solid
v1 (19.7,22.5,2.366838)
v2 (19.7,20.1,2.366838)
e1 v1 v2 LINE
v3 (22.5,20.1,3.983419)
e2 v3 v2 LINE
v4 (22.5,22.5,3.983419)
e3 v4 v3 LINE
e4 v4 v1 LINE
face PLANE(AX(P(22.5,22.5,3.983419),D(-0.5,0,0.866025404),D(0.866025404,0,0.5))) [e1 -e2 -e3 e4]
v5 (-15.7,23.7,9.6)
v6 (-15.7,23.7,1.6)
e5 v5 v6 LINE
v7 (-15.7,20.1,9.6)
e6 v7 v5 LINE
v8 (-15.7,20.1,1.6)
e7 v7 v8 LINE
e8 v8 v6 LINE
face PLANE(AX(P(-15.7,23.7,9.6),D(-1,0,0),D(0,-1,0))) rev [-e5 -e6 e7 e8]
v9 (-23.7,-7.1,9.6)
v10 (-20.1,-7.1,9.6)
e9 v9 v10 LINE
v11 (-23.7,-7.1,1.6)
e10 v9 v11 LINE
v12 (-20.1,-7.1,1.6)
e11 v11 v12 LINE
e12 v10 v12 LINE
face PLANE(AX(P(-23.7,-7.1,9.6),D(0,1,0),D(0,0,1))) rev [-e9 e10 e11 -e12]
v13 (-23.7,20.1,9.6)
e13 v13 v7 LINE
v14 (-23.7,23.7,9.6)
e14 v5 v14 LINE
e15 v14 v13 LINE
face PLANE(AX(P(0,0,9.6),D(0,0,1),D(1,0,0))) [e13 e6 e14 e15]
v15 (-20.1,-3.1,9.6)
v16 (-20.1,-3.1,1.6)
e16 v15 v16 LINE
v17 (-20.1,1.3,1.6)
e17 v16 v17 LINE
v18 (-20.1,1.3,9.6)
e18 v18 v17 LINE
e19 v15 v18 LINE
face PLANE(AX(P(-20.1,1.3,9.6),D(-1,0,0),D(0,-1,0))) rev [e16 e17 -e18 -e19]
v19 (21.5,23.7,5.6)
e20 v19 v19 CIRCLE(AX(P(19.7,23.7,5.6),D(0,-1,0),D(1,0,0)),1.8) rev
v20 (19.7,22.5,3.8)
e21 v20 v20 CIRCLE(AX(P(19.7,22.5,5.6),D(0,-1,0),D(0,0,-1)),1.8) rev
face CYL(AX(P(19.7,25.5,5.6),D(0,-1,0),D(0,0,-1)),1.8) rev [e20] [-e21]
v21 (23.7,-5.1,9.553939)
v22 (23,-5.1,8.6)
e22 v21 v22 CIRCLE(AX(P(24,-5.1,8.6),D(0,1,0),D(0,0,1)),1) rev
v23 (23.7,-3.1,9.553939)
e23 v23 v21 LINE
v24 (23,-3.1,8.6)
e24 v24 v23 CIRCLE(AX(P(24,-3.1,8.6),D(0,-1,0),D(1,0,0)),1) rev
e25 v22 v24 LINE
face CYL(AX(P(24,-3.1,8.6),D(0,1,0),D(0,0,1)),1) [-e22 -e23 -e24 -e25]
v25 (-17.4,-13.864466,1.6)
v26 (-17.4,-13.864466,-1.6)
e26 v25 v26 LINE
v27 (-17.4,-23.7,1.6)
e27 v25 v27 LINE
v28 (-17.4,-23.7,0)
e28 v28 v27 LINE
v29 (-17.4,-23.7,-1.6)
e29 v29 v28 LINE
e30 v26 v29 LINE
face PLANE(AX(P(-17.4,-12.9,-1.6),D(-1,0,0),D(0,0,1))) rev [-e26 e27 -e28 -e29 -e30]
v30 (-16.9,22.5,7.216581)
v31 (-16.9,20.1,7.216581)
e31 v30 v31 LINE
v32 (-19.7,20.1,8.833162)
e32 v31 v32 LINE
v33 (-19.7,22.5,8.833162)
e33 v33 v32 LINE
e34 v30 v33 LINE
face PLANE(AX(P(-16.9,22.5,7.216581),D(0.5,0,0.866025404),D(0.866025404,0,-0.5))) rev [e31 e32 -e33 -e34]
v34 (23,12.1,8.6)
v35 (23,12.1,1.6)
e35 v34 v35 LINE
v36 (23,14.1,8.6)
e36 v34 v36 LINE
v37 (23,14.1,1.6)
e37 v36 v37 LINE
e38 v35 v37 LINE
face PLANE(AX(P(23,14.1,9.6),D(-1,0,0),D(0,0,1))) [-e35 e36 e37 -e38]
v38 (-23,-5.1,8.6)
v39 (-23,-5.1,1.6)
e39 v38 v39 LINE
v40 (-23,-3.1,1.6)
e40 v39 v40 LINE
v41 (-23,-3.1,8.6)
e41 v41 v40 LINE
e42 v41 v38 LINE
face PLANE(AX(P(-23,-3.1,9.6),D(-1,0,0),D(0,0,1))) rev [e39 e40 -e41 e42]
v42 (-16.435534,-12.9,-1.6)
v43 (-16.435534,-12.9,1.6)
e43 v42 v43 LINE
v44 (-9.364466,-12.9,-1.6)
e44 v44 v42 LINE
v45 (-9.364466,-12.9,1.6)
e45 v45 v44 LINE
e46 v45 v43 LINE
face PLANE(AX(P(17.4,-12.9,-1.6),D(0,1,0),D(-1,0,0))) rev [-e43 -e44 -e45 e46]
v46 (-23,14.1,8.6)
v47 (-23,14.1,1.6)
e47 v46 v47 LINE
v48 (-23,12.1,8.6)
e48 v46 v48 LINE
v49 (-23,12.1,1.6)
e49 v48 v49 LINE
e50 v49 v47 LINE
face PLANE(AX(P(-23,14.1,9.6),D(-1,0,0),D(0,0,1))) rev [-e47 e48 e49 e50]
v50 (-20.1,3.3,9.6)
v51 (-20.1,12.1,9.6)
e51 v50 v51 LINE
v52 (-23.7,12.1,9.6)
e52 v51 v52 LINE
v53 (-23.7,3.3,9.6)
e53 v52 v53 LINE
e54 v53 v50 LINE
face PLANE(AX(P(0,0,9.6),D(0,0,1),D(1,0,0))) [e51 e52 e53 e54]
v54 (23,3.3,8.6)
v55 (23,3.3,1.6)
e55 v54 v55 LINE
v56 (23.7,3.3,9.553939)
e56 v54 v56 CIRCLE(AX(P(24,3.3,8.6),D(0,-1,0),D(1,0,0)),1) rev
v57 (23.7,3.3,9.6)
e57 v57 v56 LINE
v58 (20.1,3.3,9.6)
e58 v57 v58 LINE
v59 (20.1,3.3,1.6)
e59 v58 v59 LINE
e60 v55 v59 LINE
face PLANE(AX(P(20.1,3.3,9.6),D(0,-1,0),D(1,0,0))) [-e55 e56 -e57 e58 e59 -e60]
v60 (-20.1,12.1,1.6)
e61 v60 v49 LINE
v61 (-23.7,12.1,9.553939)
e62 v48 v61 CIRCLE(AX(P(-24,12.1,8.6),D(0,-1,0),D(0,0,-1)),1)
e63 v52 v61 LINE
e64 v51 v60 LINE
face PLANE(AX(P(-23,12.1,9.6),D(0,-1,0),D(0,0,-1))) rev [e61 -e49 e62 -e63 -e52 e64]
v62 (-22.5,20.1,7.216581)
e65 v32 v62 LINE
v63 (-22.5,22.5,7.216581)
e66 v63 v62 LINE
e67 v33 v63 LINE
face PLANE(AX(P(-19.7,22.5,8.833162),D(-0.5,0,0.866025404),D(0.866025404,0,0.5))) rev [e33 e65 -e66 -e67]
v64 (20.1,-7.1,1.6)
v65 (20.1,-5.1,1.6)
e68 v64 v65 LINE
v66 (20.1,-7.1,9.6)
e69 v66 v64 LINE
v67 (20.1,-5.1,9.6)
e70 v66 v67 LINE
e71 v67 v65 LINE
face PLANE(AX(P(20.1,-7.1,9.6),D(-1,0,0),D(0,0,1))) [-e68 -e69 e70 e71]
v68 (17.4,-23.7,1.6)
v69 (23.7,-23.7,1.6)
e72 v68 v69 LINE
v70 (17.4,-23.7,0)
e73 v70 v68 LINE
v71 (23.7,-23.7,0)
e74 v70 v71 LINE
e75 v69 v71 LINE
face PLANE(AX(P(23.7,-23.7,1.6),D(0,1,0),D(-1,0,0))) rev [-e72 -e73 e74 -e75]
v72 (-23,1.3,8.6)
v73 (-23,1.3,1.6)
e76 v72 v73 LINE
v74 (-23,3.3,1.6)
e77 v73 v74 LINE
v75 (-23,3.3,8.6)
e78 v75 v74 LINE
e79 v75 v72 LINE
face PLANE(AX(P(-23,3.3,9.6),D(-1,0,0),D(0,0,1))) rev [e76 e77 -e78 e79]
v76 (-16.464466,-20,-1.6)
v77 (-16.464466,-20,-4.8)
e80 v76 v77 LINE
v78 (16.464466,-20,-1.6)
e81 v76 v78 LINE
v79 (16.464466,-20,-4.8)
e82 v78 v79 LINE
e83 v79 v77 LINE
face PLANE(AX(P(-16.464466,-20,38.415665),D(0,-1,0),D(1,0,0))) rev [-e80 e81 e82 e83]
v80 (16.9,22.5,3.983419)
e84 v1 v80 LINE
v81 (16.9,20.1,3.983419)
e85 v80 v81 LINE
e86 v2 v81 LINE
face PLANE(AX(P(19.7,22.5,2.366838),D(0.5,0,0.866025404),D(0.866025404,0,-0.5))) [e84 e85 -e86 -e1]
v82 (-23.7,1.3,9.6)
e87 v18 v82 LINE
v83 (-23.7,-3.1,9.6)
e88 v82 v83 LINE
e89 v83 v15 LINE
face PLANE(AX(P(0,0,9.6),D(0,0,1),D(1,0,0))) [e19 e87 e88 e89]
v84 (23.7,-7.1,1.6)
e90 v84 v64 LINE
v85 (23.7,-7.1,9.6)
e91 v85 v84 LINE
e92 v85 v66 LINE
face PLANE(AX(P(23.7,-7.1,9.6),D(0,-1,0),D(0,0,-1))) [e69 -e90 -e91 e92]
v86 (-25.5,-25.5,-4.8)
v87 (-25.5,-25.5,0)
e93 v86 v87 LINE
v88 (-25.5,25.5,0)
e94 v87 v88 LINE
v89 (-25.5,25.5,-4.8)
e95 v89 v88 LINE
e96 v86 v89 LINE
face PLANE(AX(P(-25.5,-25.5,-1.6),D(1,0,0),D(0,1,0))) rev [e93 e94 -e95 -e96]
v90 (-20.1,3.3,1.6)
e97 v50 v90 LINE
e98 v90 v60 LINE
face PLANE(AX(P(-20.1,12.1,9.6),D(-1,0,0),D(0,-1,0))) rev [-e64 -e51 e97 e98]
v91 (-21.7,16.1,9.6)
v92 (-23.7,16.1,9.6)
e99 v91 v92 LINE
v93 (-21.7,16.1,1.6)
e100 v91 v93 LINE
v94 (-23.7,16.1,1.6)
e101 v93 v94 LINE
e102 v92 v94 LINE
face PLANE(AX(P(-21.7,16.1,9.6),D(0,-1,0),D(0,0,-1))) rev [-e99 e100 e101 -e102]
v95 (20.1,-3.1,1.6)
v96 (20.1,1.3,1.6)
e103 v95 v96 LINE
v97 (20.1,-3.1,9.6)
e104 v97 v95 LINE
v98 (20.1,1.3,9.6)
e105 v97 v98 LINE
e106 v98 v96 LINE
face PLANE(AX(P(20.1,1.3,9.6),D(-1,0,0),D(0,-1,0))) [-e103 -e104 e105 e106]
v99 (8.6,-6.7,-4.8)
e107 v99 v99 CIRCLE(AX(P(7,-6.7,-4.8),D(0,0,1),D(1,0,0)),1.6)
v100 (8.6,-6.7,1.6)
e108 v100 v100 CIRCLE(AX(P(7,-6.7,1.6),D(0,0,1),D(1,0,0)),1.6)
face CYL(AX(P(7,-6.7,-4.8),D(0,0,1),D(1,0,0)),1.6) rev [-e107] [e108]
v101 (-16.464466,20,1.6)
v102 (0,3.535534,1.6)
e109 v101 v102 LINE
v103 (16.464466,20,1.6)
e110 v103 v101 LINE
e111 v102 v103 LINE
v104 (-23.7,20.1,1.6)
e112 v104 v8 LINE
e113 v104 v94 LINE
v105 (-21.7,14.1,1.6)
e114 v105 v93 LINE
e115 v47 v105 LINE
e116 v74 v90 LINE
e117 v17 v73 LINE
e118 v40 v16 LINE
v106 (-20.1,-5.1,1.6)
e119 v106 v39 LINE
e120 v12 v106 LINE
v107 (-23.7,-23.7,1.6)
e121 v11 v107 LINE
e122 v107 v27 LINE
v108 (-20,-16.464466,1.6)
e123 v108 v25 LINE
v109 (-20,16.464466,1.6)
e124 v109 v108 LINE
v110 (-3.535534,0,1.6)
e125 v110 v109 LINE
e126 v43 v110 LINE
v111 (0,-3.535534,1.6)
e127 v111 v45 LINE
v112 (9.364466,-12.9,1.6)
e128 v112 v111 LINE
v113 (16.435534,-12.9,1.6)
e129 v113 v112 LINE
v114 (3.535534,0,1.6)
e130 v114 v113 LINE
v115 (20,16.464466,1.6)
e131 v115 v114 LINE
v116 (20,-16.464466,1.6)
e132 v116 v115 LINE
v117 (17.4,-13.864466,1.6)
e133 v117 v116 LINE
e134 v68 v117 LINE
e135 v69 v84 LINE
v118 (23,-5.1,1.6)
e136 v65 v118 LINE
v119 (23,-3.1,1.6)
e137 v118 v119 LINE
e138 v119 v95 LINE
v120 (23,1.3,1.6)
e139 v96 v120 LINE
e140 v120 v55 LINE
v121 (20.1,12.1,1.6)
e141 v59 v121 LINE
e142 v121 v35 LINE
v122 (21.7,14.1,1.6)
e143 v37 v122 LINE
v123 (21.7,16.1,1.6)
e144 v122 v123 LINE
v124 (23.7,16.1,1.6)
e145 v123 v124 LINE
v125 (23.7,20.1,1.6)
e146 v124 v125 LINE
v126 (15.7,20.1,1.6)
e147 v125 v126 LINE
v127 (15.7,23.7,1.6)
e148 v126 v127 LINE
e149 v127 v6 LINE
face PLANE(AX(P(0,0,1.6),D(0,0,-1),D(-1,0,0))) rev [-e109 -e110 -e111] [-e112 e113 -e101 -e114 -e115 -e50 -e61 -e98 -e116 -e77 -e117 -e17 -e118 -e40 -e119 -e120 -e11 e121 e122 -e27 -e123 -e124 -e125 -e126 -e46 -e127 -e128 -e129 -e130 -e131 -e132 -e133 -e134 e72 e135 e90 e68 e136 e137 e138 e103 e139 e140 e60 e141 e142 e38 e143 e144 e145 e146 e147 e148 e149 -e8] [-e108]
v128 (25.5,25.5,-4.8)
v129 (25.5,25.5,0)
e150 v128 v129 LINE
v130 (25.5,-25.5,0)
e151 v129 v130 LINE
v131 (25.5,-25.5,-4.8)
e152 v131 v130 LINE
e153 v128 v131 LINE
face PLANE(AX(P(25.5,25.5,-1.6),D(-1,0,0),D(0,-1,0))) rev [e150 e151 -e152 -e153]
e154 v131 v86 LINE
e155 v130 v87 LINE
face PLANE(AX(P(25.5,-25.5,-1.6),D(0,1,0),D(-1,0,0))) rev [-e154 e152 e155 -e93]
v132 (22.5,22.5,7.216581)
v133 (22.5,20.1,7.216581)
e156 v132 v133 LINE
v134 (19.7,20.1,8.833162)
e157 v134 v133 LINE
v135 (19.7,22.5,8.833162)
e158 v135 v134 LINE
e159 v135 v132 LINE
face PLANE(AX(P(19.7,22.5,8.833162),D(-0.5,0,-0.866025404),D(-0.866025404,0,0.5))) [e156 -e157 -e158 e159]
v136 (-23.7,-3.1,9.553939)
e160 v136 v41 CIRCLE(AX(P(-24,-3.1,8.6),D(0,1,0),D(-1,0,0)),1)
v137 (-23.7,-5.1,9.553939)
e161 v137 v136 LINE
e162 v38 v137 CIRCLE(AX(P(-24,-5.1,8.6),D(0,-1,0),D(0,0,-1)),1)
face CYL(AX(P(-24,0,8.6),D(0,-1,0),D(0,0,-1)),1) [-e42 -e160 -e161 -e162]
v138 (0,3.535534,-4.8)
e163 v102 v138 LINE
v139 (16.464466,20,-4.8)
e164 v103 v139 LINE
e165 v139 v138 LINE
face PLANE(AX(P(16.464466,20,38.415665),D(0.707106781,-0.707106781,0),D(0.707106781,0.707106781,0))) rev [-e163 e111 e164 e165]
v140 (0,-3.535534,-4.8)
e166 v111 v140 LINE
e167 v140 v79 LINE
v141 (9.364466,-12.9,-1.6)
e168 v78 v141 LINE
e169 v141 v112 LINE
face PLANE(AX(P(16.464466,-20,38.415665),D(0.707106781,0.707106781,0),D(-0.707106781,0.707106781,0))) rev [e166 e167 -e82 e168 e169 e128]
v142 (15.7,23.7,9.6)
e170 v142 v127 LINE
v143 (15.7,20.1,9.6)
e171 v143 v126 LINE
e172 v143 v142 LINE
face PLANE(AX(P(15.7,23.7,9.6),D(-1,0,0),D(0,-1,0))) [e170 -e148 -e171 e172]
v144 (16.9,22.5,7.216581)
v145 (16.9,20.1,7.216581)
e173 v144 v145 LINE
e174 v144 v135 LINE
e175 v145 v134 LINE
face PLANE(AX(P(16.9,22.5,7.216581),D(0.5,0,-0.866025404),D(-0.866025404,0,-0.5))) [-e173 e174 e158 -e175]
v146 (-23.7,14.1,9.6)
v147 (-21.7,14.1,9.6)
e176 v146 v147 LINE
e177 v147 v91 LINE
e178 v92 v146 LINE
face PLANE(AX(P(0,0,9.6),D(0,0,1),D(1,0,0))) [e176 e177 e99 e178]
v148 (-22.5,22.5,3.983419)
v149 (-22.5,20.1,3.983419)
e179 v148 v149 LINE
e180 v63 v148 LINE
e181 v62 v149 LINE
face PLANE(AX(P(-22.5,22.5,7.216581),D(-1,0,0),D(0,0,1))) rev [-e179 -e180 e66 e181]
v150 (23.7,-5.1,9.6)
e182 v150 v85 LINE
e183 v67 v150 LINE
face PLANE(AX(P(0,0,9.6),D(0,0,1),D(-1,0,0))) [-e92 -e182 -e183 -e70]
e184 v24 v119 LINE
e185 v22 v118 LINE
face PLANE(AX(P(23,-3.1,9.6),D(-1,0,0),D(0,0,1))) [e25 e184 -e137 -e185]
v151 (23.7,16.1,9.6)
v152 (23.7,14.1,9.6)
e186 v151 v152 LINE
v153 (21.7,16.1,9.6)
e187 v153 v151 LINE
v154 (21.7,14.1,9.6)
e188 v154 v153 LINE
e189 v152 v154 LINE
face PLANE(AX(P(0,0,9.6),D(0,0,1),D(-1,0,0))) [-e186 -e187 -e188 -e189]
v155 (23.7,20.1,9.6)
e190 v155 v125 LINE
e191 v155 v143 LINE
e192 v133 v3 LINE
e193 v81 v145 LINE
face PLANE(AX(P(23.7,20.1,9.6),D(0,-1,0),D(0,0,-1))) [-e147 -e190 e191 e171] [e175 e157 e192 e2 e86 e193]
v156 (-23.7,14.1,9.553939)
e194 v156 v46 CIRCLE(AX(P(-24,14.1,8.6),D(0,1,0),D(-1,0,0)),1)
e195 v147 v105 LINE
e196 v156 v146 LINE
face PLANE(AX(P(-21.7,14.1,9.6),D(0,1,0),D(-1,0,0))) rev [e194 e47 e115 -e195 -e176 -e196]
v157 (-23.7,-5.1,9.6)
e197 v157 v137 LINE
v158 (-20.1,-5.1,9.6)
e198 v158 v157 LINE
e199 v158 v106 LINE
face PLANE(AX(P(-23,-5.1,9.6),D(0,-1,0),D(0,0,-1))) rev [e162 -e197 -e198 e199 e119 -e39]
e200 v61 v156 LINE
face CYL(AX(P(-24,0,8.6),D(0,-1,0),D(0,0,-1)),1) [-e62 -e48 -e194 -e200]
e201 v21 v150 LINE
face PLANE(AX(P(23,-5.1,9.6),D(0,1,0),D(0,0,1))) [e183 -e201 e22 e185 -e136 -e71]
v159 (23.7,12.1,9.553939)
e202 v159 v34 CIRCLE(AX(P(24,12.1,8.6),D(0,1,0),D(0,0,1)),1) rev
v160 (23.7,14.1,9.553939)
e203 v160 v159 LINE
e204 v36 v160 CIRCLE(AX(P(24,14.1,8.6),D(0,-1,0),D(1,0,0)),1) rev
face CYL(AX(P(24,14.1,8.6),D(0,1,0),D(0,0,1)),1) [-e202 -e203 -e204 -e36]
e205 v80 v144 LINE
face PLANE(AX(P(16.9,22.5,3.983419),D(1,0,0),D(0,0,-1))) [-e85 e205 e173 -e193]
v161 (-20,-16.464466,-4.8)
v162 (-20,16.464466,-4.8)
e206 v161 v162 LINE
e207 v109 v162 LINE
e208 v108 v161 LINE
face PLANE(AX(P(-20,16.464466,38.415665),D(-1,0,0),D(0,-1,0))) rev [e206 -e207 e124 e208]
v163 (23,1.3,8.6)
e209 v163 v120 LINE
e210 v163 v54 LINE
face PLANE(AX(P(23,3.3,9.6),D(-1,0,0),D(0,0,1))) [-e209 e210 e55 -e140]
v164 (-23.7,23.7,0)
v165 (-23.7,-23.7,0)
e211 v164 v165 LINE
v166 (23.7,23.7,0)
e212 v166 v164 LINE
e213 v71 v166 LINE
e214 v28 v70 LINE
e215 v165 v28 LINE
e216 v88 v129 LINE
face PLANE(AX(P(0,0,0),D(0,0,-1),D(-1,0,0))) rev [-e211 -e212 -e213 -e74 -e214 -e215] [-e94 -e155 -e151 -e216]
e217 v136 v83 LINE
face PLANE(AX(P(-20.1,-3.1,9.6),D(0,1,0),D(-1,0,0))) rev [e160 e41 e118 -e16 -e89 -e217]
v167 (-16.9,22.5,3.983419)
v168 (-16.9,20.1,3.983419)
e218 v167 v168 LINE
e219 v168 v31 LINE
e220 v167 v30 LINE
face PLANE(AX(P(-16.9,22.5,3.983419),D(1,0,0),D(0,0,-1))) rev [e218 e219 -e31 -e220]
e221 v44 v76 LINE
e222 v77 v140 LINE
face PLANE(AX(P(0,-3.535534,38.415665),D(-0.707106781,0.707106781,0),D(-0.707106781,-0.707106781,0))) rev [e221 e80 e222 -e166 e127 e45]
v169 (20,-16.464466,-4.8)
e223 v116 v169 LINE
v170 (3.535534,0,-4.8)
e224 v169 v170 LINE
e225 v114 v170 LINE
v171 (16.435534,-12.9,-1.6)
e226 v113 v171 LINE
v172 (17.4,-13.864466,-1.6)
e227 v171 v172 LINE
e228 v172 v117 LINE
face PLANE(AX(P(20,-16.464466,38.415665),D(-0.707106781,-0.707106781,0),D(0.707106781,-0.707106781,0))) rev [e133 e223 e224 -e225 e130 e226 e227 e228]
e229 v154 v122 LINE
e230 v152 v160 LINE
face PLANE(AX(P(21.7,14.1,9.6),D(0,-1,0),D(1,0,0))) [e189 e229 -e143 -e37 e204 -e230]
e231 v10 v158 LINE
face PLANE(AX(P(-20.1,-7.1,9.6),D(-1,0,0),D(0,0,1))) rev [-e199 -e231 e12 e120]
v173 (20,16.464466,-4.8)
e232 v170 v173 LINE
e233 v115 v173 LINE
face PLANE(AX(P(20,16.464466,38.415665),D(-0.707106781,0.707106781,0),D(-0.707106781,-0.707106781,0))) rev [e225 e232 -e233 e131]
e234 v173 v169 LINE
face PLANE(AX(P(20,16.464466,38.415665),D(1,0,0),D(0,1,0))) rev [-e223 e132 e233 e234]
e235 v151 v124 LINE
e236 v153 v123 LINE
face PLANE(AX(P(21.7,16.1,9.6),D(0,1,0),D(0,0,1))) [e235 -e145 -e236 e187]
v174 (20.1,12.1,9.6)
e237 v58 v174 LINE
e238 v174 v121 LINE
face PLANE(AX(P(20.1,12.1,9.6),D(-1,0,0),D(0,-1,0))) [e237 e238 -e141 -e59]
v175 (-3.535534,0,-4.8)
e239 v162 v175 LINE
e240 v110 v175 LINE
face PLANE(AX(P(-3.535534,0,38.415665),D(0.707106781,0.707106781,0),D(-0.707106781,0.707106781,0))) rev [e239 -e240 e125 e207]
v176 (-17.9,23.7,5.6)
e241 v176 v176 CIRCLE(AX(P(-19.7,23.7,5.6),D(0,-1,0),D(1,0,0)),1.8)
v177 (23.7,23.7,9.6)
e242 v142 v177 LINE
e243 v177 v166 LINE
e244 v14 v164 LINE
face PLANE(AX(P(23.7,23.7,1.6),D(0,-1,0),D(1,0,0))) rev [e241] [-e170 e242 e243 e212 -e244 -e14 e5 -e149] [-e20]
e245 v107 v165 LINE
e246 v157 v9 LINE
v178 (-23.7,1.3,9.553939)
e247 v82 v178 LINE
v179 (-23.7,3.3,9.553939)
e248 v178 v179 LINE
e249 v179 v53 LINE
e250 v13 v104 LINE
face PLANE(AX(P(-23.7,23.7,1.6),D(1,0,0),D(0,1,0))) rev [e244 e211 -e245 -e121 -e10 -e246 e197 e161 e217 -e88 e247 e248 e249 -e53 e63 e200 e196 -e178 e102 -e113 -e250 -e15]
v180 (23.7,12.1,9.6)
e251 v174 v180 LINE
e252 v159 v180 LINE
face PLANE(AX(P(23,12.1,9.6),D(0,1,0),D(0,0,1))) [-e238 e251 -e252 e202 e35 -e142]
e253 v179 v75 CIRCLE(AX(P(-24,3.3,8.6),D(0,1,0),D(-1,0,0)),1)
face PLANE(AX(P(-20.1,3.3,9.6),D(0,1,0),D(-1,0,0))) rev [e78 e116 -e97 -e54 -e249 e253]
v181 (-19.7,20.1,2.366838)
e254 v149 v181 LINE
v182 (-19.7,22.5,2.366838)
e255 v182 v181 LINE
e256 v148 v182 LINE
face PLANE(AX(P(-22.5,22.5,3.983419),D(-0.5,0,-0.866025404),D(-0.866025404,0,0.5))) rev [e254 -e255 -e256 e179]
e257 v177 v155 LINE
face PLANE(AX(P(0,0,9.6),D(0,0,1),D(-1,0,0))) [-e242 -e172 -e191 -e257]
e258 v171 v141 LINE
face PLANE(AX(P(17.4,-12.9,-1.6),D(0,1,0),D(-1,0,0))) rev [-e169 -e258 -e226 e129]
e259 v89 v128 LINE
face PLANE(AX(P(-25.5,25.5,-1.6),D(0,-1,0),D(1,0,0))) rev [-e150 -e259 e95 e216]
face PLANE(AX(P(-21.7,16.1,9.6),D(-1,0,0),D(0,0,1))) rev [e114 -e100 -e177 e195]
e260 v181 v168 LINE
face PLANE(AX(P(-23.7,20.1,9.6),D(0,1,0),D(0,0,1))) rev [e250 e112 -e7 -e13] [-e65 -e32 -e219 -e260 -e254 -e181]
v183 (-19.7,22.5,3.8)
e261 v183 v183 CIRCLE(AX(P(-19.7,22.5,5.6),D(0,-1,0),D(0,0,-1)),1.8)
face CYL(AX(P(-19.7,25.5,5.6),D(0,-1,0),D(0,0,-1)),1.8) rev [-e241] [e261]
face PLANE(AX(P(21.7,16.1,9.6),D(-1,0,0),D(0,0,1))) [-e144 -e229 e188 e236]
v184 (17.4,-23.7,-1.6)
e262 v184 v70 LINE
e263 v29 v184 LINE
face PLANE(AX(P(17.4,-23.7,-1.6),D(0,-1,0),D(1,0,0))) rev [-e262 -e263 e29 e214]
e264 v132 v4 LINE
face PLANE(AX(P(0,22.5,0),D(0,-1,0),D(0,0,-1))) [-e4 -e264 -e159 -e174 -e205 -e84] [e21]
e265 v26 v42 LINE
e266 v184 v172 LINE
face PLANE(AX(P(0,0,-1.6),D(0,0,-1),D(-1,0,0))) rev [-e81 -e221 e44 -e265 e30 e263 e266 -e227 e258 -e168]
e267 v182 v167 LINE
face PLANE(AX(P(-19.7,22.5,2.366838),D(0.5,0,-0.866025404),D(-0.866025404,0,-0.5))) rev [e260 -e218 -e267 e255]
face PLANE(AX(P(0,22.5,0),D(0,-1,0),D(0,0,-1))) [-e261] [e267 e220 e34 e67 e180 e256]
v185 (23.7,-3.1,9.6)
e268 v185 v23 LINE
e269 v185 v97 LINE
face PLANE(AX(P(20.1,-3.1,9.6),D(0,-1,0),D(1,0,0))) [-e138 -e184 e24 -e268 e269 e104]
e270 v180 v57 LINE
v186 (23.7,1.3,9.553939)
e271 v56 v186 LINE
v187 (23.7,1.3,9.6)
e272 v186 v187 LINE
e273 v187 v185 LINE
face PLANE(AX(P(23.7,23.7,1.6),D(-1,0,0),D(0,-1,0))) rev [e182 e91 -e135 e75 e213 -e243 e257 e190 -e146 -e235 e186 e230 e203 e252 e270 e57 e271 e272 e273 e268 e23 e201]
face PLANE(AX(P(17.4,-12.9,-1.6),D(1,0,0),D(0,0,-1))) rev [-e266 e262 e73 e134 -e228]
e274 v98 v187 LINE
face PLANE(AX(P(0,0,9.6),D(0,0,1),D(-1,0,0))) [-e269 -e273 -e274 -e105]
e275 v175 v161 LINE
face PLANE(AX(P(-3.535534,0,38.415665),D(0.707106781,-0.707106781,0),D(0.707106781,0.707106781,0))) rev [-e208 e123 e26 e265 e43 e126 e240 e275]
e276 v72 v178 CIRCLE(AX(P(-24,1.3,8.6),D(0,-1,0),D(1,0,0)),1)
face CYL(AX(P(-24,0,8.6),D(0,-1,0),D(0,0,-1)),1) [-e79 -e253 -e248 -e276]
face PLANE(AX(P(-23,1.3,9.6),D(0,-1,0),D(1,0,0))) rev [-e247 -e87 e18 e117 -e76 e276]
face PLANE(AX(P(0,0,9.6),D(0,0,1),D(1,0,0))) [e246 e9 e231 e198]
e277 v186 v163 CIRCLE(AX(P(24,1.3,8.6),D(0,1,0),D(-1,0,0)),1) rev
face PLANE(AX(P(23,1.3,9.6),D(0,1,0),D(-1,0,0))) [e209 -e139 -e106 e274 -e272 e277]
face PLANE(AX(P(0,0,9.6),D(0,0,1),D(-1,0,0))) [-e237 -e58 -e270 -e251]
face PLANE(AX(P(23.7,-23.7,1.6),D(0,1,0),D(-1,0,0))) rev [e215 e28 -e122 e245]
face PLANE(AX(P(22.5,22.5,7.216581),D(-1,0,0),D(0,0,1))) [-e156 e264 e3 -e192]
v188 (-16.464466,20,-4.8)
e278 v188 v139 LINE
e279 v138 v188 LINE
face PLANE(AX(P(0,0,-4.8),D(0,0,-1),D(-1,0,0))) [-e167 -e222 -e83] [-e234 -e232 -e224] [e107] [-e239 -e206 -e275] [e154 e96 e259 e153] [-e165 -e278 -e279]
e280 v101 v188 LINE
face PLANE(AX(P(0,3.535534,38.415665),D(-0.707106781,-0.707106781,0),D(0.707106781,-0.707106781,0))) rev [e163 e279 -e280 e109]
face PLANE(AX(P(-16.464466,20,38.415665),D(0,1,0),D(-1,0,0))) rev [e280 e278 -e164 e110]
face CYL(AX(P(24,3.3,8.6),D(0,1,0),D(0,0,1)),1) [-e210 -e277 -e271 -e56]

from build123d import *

# Parameters (mm, degrees)
ESBO_O3_W                = 47.4
ESBO_O3_H                = 47.4
RESSALTO_EXTRUS_O2_DEPTH = 1.6
ESBO_O5_W                = 51
ESBO_O5_H                = 51
RESSALTO_EXTRUS_O3_DEPTH = 1.6
CORTE_EXTRUS_O1_DEPTH    = 3.2
ESBO_O7_W                = 8
ESBO_O7_H                = 3.6
RESSALTO_EXTRUS_O4_DEPTH = 8
FILETE1_R                = 1
ESBO_O8_W                = 51
ESBO_O8_H                = 51
RESSALTO_EXTRUS_O5_DEPTH = 3.2
ESBO_O9_W                = 34.8
ESBO_O9_H                = 10.8
CORTE_EXTRUS_O2_DEPTH    = 3.2
ESBO_O10_R               = 1.6
CORTE_EXTRUS_O3_DEPTH    = 37.939139135
ESBO_O11_R               = 1.8
CORTE_EXTRUS_O4_DEPTH    = 2.4
ESBO_O11_2_R             = 1.8
CORTE_EXTRUS_O5_DEPTH    = 54.120335089


with BuildPart() as part:
    # Esboço3 → Ressalto-extrusão2 (new body)
    with BuildSketch(Plane.XY):
        Rectangle(ESBO_O3_W, ESBO_O3_H)
    extrude(amount=RESSALTO_EXTRUS_O2_DEPTH)

    # Esboço5 → Ressalto-extrusão3 (add)
    with BuildSketch(Plane(origin=(0, 0, 0), x_dir=(-1, 0, 0), z_dir=(0, 0, -1))):
        Rectangle(ESBO_O5_W, ESBO_O5_H)
    extrude(amount=RESSALTO_EXTRUS_O3_DEPTH)

    # Esboço6 → Corte-extrusão1 (cut)
    with BuildSketch(Plane(origin=(0, 0, -1.6), x_dir=(-1, 0, 0), z_dir=(0, 0, -1))):
        Polygon((3.535533906, 0), (20, 16.464466094), (20, -16.464466094), align=None)
        Polygon((-16.464466094, -20), (0, -3.535533906), (16.464466094, -20), align=None)
        Polygon((-20, 16.464466094), (-3.535533906, 0), (-20, -16.464466094), align=None)
        Polygon((-16.464466094, 20), (0, 3.535533906), (16.464466094, 20), align=None)
    extrude(amount=-CORTE_EXTRUS_O1_DEPTH, mode=Mode.SUBTRACT)

    # Esboço7 → Ressalto-extrusão4 (add)
    with BuildSketch(Plane.XY.offset(1.6)):
        Polygon((-23.7, 16.1), (-23.7, -7.1), (-20.1, -7.1), (-20.1, -5.1), (-23, -5.1), (-23, -3.1), (-20.1, -3.1), (-20.1, 1.3), (-23, 1.3), (-23, 3.3), (-20.1, 3.3), (-20.1, 12.1), (-23, 12.1), (-23, 14.1), (-21.7, 14.1), (-21.7, 16.1), align=None)
        with Locations((-19.7, 21.9)):
            Rectangle(ESBO_O7_W, ESBO_O7_H)
    ressalto_extrus_o4 = extrude(amount=RESSALTO_EXTRUS_O4_DEPTH)

    # Espelhar1: Ressalto-extrusão4 across plane
    add(ressalto_extrus_o4.mirror(Plane(origin=(0, 0, 0), x_dir=(0, 0, 1), z_dir=(1, 0, 0))))

    # Filete1
    # the kernel refuses this fillet: 1 mm, written as the material it takes off along each edge
    with BuildSketch(Plane(origin=(-23, 1.3, 9.6), x_dir=(-1, 0, 0), z_dir=(0, 1, 0)), Plane(origin=(-23, 12.1, 9.6), x_dir=(-1, 0, 0), z_dir=(0, 1, 0)), Plane(origin=(-23, -5.1, 9.6), x_dir=(-1, 0, 0), z_dir=(0, 1, 0))) as filete1_piece_1:
        with BuildLine():
            CenterArc((FILETE1_R, -FILETE1_R), FILETE1_R, 90, 90)
            Line((0, -FILETE1_R), (0, 0))
            Line((0, 0), (FILETE1_R, 0))
        make_face()
    extrude(amount=2, mode=Mode.SUBTRACT)
    with BuildSketch(Plane(origin=(23, 12.1, 9.6), x_dir=(1, 0, 0), z_dir=(0, 1, 0)), Plane(origin=(23, 1.3, 9.6), x_dir=(1, 0, 0), z_dir=(0, 1, 0)), Plane(origin=(23, -5.1, 9.6), x_dir=(1, 0, 0), z_dir=(0, 1, 0))) as filete1_piece_2:
        with BuildLine():
            CenterArc((FILETE1_R, FILETE1_R), FILETE1_R, 180, 90)
            Line((0, FILETE1_R), (0, 0))
            Line((0, 0), (FILETE1_R, 0))
        make_face()
    extrude(amount=2, mode=Mode.SUBTRACT)

    # Esboço8 → Ressalto-extrusão5 (add)
    with BuildSketch(Plane(origin=(0, 0, -1.6), x_dir=(-1, 0, 0), z_dir=(0, 0, -1))):
        Rectangle(ESBO_O8_W, ESBO_O8_H)
        Polygon((-16.464466094, -20), (16.464466094, -20), (0, -3.535533906), align=None, mode=Mode.SUBTRACT)
        Polygon((-20, -16.464466094), (-3.535533906, 0), (-20, 16.464466094), align=None, mode=Mode.SUBTRACT)
        Polygon((3.535533906, 0), (20, -16.464466094), (20, 16.464466094), align=None, mode=Mode.SUBTRACT)
        Polygon((0, 3.535533906), (16.464466094, 20), (-16.464466094, 20), align=None, mode=Mode.SUBTRACT)
    extrude(amount=RESSALTO_EXTRUS_O5_DEPTH)

    # Esboço9 → Corte-extrusão2 (cut)
    with BuildSketch(Plane.XY.offset(1.6)):
        with Locations((0, -18.3)):
            Rectangle(ESBO_O9_W, ESBO_O9_H)
    extrude(amount=-CORTE_EXTRUS_O2_DEPTH, mode=Mode.SUBTRACT)

    # Esboço10 → Corte-extrusão3 (cut, through all)
    with BuildSketch(Plane.XY.offset(1.6)):
        with Locations((7, -6.7)):
            Circle(ESBO_O10_R)
    extrude(amount=-CORTE_EXTRUS_O3_DEPTH, mode=Mode.SUBTRACT)

    # Esboço11 → Corte-extrusão4 (cut)
    with BuildSketch(Plane.XZ.offset(-20.1)):
        Polygon((-19.7, 8.833161507), (-22.5, 7.216580754), (-22.5, 3.983419246), (-19.7, 2.366838493), (-16.9, 3.983419246), (-16.9, 7.216580754), align=None)
        with Locations(Location((-19.7, 5.6, 0), (0, 0, 270))):
            Circle(ESBO_O11_R, mode=Mode.SUBTRACT)
    corte_extrus_o4 = extrude(amount=-CORTE_EXTRUS_O4_DEPTH, mode=Mode.SUBTRACT)

    # Esboço11<2> → Corte-extrusão5 (cut, through all)
    with BuildSketch(Plane.XZ.offset(-20.1)):
        with Locations(Location((-19.7, 5.6, 0), (0, 0, 270))):
            Circle(ESBO_O11_2_R)
    corte_extrus_o5 = extrude(amount=-CORTE_EXTRUS_O5_DEPTH, mode=Mode.SUBTRACT)

    # Espelhar2: Corte-extrusão4, Corte-extrusão5 across plane
    add(corte_extrus_o4.mirror(Plane(origin=(0, 0, 0), x_dir=(0, 0, 1), z_dir=(1, 0, 0))), mode=Mode.SUBTRACT)
    add(corte_extrus_o5.mirror(Plane(origin=(0, 0, 0), x_dir=(0, 0, 1), z_dir=(1, 0, 0))), mode=Mode.SUBTRACT)


solid = part.part
